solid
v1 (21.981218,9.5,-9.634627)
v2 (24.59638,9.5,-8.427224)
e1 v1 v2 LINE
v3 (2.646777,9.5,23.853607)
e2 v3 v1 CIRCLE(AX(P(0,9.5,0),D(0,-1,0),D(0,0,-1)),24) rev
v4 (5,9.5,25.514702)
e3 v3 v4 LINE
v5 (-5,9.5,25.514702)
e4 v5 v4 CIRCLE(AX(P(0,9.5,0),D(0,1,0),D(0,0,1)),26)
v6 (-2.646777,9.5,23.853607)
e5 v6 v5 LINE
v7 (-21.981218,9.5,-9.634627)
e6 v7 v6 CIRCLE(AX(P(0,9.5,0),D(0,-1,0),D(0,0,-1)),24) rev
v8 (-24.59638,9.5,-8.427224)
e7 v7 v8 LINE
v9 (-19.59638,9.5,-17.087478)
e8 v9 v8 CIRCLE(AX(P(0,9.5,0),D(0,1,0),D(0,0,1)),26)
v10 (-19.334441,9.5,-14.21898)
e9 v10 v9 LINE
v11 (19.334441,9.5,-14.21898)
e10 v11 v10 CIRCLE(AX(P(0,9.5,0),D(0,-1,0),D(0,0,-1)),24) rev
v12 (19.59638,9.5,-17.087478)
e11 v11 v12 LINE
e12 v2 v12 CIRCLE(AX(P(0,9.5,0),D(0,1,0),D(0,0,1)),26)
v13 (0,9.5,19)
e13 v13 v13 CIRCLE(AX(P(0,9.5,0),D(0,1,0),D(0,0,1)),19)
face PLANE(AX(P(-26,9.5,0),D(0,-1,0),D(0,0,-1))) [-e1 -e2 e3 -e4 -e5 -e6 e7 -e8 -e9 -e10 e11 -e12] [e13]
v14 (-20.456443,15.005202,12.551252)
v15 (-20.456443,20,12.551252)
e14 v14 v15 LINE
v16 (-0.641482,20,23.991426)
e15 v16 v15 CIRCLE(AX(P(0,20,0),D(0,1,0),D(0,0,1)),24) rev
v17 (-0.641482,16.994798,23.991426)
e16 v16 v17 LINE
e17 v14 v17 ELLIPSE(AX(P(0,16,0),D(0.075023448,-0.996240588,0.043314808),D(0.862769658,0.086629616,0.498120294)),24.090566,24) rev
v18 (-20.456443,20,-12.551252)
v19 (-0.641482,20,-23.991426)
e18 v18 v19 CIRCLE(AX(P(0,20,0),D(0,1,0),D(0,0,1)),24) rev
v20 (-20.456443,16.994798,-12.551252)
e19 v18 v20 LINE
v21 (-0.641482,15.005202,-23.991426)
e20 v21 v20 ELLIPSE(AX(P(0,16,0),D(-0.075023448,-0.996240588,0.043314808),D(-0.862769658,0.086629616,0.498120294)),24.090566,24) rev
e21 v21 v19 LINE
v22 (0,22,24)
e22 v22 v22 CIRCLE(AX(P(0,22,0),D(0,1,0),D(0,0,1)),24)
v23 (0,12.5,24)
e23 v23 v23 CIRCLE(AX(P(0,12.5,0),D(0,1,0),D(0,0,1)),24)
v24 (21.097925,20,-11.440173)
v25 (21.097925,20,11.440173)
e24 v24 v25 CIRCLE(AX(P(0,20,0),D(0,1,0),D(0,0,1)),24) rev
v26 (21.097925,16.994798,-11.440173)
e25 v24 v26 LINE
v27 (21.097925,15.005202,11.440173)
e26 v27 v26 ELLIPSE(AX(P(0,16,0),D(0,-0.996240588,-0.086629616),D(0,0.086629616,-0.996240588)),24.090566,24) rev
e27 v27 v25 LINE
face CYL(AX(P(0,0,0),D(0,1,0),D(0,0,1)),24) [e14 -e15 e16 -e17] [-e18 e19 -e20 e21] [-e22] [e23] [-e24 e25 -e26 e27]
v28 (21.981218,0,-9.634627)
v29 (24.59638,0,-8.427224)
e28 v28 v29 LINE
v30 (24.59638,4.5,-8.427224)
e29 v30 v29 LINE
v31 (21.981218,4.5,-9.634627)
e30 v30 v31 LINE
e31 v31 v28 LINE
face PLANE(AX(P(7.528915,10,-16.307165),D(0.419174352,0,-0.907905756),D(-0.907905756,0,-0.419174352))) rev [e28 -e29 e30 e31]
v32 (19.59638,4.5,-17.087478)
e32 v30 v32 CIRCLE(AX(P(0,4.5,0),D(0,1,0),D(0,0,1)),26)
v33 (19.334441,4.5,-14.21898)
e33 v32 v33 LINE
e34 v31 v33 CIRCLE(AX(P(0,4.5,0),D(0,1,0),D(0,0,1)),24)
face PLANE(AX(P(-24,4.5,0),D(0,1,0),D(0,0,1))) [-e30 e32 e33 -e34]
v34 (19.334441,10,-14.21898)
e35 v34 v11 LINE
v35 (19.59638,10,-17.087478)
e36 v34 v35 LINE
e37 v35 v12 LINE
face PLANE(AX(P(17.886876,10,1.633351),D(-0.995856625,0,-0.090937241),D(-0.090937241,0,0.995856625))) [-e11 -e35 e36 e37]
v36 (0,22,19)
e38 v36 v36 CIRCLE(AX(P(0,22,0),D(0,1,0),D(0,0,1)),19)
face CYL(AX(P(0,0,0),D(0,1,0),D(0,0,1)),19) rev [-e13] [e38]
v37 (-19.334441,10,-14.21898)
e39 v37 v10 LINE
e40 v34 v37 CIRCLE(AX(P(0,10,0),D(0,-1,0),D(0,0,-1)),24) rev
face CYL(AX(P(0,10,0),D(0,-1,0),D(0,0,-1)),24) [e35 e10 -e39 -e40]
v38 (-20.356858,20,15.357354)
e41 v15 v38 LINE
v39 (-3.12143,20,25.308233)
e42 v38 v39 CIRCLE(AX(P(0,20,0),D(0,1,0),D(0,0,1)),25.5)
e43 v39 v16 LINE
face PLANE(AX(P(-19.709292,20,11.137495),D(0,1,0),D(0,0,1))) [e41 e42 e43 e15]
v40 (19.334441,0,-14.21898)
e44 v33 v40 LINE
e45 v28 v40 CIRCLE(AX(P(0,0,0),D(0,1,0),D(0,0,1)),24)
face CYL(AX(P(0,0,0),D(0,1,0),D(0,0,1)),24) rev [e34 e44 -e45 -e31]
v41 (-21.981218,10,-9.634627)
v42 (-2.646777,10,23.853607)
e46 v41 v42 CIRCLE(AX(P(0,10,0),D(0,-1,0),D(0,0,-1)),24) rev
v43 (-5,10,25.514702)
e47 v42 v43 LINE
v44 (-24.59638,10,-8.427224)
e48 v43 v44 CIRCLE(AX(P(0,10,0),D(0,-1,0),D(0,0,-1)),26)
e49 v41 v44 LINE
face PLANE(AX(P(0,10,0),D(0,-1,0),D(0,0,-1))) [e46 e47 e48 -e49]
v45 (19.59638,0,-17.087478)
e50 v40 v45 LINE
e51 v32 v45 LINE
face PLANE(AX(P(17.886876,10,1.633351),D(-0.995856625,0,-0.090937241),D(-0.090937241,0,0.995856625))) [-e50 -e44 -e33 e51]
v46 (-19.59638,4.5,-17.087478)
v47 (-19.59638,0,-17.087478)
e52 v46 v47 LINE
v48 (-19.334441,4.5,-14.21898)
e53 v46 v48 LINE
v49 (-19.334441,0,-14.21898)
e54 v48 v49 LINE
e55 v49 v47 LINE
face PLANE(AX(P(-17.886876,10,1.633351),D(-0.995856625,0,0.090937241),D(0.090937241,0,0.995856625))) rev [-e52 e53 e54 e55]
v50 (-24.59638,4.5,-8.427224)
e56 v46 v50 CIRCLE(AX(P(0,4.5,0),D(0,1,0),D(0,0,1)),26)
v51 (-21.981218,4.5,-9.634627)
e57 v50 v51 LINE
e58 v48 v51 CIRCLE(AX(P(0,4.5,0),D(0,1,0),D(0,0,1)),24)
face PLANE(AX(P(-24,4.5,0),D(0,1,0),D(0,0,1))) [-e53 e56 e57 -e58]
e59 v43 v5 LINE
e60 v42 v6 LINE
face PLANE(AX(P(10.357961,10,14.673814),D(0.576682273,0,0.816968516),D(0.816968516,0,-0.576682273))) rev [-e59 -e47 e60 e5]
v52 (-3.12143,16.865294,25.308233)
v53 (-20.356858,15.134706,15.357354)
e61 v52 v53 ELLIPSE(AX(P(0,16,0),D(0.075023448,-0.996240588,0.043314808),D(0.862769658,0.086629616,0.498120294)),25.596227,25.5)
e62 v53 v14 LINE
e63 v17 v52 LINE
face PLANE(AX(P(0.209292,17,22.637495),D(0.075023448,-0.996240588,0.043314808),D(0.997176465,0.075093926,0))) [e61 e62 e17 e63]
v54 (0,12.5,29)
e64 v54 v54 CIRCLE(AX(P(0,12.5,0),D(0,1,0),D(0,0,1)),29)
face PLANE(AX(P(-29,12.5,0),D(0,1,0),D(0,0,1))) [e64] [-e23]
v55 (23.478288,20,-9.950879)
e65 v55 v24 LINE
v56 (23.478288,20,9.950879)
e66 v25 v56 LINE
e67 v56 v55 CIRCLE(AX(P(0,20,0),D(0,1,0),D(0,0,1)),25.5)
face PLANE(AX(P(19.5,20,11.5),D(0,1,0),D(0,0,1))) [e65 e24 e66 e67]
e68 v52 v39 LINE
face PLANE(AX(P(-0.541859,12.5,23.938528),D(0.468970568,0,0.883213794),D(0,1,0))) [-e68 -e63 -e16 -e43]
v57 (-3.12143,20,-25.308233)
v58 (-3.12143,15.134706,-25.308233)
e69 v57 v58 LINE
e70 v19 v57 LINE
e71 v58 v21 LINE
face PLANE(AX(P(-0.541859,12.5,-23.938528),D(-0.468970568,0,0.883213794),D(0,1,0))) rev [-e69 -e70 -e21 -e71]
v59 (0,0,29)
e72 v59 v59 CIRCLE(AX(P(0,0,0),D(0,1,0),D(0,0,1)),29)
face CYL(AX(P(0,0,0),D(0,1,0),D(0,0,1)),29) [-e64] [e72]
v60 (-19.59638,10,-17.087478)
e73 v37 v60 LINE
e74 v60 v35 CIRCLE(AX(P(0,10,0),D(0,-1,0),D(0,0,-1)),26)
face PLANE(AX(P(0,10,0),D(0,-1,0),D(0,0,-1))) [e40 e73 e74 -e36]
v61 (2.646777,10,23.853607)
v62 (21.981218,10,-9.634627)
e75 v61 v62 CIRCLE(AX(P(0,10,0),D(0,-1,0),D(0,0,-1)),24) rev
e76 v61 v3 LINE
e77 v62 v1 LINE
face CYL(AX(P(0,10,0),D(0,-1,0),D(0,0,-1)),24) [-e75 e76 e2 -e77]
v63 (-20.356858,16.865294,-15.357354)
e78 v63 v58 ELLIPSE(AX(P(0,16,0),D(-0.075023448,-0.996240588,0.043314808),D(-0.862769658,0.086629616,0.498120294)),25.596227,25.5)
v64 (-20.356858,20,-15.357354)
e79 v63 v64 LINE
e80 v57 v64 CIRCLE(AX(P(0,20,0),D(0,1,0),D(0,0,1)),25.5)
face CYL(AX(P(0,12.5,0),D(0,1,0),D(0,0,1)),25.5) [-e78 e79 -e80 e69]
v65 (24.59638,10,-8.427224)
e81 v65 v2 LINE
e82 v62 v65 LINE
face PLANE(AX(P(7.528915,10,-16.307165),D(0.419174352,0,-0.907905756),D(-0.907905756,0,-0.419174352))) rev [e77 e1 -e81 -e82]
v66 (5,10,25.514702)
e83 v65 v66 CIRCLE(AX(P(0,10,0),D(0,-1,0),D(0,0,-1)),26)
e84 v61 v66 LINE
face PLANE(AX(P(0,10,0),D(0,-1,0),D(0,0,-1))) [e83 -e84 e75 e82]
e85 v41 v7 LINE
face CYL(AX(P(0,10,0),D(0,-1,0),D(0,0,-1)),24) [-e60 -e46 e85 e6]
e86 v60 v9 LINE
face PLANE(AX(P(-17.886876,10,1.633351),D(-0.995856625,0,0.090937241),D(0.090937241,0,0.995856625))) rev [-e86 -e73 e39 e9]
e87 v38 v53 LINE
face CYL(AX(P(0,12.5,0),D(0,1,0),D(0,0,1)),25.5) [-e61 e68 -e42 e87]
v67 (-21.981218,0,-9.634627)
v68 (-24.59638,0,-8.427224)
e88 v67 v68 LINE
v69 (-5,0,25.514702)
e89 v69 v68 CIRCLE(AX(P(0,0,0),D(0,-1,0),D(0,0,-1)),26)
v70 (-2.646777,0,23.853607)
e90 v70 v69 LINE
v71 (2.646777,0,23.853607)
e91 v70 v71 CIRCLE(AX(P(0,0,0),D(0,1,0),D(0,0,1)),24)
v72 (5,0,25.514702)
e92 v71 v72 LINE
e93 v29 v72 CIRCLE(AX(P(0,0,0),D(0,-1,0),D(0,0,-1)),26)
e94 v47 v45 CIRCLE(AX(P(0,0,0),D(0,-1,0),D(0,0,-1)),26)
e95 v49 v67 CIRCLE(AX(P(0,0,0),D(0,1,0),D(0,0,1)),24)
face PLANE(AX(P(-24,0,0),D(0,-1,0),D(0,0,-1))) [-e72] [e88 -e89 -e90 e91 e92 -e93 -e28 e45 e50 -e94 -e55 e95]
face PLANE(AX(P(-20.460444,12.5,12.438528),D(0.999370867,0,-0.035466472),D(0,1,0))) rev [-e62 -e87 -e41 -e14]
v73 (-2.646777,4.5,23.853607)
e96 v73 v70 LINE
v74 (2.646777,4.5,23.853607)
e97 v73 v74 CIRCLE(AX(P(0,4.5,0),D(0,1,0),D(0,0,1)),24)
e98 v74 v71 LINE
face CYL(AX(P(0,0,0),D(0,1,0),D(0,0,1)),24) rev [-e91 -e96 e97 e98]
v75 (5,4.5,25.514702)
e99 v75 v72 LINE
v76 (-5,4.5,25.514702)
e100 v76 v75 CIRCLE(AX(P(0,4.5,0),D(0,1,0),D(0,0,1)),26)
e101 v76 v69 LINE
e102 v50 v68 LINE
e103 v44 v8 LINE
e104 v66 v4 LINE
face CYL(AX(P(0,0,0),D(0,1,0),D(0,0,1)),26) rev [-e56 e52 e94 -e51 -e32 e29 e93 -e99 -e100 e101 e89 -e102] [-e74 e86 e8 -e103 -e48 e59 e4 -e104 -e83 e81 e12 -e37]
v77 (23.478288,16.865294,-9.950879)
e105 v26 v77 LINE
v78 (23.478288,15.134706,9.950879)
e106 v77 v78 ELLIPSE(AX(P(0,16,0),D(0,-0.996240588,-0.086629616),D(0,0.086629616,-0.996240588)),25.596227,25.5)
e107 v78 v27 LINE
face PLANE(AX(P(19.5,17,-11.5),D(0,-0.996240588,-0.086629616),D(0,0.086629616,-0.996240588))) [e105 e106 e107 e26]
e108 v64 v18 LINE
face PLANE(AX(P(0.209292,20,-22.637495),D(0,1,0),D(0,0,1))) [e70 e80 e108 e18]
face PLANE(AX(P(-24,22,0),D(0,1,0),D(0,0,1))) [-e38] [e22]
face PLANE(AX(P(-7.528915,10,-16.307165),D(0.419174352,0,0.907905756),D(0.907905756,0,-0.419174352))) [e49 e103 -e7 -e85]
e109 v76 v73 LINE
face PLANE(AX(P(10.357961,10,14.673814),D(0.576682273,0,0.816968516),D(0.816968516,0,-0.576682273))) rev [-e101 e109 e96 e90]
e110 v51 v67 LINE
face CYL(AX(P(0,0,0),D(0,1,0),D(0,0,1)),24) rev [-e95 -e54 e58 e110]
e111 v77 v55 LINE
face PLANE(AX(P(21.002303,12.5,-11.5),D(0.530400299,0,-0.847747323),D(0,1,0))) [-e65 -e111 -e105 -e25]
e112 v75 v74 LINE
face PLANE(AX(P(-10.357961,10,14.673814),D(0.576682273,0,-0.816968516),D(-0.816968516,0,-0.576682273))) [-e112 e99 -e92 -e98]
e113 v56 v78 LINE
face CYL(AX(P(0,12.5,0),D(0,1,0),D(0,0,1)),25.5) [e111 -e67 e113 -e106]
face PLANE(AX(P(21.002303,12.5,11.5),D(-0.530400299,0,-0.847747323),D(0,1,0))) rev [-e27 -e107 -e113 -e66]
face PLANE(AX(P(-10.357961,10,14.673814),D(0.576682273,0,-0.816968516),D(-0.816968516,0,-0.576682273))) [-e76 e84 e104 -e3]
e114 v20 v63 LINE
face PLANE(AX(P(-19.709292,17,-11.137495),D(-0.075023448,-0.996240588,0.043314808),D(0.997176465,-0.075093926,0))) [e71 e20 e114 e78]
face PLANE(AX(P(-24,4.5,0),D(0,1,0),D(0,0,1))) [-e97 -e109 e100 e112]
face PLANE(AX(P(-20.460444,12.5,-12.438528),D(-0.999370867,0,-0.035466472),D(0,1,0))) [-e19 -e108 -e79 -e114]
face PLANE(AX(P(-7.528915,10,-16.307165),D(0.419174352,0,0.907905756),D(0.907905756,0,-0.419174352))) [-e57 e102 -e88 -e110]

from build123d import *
from build123d.topology import SkipClean

# Parameters (mm, degrees)
CUT_EXTRUDE_START        = -10
CUT_EXTRUDE_1_DEPTH      = 10
EXTRUDE_1_DEPTH          = 6
PATTERN_CIRCULAR_1_COUNT = 3
SKETCH_4_R               = 42.404307435
SKETCH_4_R_2             = 25.5
CUT_EXTRUDE_2_DEPTH      = 9.5
CHAMFER_START            = 14
CHAMFER_1_DEPTH          = 6


with BuildPart() as part:
    # Эскиз1 → Повернуть1 (revolve)
    with BuildSketch(Plane.XY, mode=Mode.PRIVATE) as revolve_1_sk:
        Polygon((-24, 0), (-24, 4.5), (-26, 4.5), (-26, 9.5), (-19, 9.5), (-19, 22), (-24, 22), (-24, 12.5), (-29, 12.5), (-29, 0), align=None)
    revolve(revolve_1_sk.sketch.rotate(Axis((0, 0, 0), (0, -1, 0)), 270), axis=Axis((0, 0, 0), (0, -1, 0)))

    # Эскиз2 → Вырез-Вытянуть1 (cut)
    with SkipClean():  # the faces are left unmerged after this step: merging them gives an invalid solid
        with BuildSketch(Plane(origin=(0, 0, 0), x_dir=(-1, 0, 0), z_dir=(0, -1, 0)).offset(CUT_EXTRUDE_START)):
            with BuildLine():
                ThreePointArc((24, 0), (17.8818714, -16.007456864), (2.646777063, -23.85360709))
                Line((2.646777063, -23.85360709), (5, -25.514701644))
                ThreePointArc((5, -25.514701644), (20.0748599, -16.522711642), (26, 0))
                ThreePointArc((26, 0), (25.646694472, 4.271658071), (24.596379794, 8.427223803))
                Line((24.596379794, 8.427223803), (21.981218243, 9.63462737))
                ThreePointArc((21.981218243, 9.63462737), (23.489883331, 4.921928594), (24, 0))
            make_face()
            with BuildLine():
                Line((-5, -25.514701644), (-2.646777063, -23.85360709))
                ThreePointArc((-2.646777063, -23.85360709), (-20.784609691, -12), (-21.981218243, 9.63462737))
                Line((-21.981218243, 9.63462737), (-24.596379794, 8.427223803))
                ThreePointArc((-24.596379794, 8.427223803), (-22.516660498, -13), (-5, -25.514701644))
            make_face()
            with BuildLine():
                Line((-19.596379794, 17.087477841), (-19.33444118, 14.218979719))
                ThreePointArc((-19.33444118, 14.218979719), (0, 24), (19.33444118, 14.218979719))
                Line((19.33444118, 14.218979719), (19.596379794, 17.087477841))
                ThreePointArc((19.596379794, 17.087477841), (0, 26), (-19.596379794, 17.087477841))
            make_face()
        extrude(amount=CUT_EXTRUDE_1_DEPTH, mode=Mode.SUBTRACT)

    # Эскиз3 → Бобышка-Вытянуть1 (add)
    with SkipClean():  # the faces are left unmerged after this step: merging them gives an invalid solid
        with BuildSketch(Plane(origin=(25.5, 0, 0), x_dir=(0, 0, -1), z_dir=(1, 0, 0))):
            Polygon((-11.5, 20), (11.5, 20), (11.5, 17), (-11.5, 15), align=None)
        extrude_1 = extrude(amount=-EXTRUDE_1_DEPTH)

    # Круговой массив1: Бобышка-Вытянуть1 ×3 about axis
    with SkipClean():  # the faces are left unmerged after this step: merging them gives an invalid solid
        pattern_circular_1_axis = Axis((0, 0, 0), (0, 1, 0))
        for i in range(1, PATTERN_CIRCULAR_1_COUNT):
            add(extrude_1.rotate(pattern_circular_1_axis, i * 360 / PATTERN_CIRCULAR_1_COUNT))

    # Эскиз4 → Вырез-Вытянуть2 (cut)
    with SkipClean():  # the faces are left unmerged after this step: merging them gives an invalid solid
        with BuildSketch(Plane(origin=(0, 22, 0), x_dir=(1, 0, 0), z_dir=(0, 1, 0))):
            Circle(SKETCH_4_R)
            Circle(SKETCH_4_R_2, mode=Mode.SUBTRACT)
        extrude(amount=-CUT_EXTRUDE_2_DEPTH, mode=Mode.SUBTRACT)

    # Фаска1: read off the stored shape, not the designer's step
    # Фаска1 outline → Фаска1 (cut)
    with SkipClean():  # the faces are left unmerged after this step: merging them gives an invalid solid
        with BuildSketch(Plane(origin=(0, 0, 0), x_dir=(1, 0, 0), z_dir=(0, 1, 0)).offset(CHAMFER_START)):
            with BuildLine():
                Line((-20.456443185, 12.551252218), (-20.356857991, 15.357354354))
                ThreePointArc((-20.356857991, 15.357354354), (-20.859675731, 14.667103612), (-21.33909882, 13.960403344))
                Line((-21.33909882, 13.960403344), (-20.49197936, 12.493149399))
                ThreePointArc((-20.49197936, 12.493149399), (-20.474231883, 12.522213414), (-20.456443185, 12.551252218))
            make_face()
            with BuildLine():
                ThreePointArc((-1.420514533, 25.460403344), (-2.272246462, 25.398560904), (-3.12143001, 25.308233338))
                Line((-3.12143001, 25.308233338), (-0.641481678, 23.991425578))
                ThreePointArc((-0.641481678, 23.991425578), (-0.607438987, 23.992311641), (-0.573395073, 23.993149399))
                Line((-0.573395073, 23.993149399), (-1.420514533, 25.460403344))
            make_face()
            with BuildLine():
                ThreePointArc((-20.456443185, -12.551252218), (-20.474231883, -12.522213414), (-20.49197936, -12.493149399))
                Line((-20.49197936, -12.493149399), (-21.33909882, -13.960403344))
                ThreePointArc((-21.33909882, -13.960403344), (-20.859675731, -14.667103612), (-20.356857991, -15.357354354))
                Line((-20.356857991, -15.357354354), (-20.456443185, -12.551252218))
            make_face()
            with BuildLine():
                Line((22.759613353, 11.5), (21.065374433, 11.5))
                ThreePointArc((21.065374433, 11.5), (21.08167087, 11.470098227), (21.097924862, 11.44017336))
                Line((21.097924862, 11.44017336), (23.478288, 9.950878984))
                ThreePointArc((23.478288, 9.950878984), (23.131922194, 10.731457292), (22.759613353, 11.5))
            make_face()
            with BuildLine():
                ThreePointArc((-0.573395073, -23.993149399), (-0.607438987, -23.992311641), (-0.641481678, -23.991425578))
                Line((-0.641481678, -23.991425578), (-3.12143001, -25.308233338))
                ThreePointArc((-3.12143001, -25.308233338), (-2.272246462, -25.398560904), (-1.420514533, -25.460403344))
                Line((-1.420514533, -25.460403344), (-0.573395073, -23.993149399))
            make_face()
            with BuildLine():
                ThreePointArc((22.759613353, -11.5), (23.131922194, -10.731457292), (23.478288, -9.950878984))
                Line((23.478288, -9.950878984), (21.097924862, -11.44017336))
                ThreePointArc((21.097924862, -11.44017336), (21.08167087, -11.470098227), (21.065374433, -11.5))
                Line((21.065374433, -11.5), (22.759613353, -11.5))
            make_face()
        extrude(amount=CHAMFER_1_DEPTH, mode=Mode.SUBTRACT)


solid = part.part
